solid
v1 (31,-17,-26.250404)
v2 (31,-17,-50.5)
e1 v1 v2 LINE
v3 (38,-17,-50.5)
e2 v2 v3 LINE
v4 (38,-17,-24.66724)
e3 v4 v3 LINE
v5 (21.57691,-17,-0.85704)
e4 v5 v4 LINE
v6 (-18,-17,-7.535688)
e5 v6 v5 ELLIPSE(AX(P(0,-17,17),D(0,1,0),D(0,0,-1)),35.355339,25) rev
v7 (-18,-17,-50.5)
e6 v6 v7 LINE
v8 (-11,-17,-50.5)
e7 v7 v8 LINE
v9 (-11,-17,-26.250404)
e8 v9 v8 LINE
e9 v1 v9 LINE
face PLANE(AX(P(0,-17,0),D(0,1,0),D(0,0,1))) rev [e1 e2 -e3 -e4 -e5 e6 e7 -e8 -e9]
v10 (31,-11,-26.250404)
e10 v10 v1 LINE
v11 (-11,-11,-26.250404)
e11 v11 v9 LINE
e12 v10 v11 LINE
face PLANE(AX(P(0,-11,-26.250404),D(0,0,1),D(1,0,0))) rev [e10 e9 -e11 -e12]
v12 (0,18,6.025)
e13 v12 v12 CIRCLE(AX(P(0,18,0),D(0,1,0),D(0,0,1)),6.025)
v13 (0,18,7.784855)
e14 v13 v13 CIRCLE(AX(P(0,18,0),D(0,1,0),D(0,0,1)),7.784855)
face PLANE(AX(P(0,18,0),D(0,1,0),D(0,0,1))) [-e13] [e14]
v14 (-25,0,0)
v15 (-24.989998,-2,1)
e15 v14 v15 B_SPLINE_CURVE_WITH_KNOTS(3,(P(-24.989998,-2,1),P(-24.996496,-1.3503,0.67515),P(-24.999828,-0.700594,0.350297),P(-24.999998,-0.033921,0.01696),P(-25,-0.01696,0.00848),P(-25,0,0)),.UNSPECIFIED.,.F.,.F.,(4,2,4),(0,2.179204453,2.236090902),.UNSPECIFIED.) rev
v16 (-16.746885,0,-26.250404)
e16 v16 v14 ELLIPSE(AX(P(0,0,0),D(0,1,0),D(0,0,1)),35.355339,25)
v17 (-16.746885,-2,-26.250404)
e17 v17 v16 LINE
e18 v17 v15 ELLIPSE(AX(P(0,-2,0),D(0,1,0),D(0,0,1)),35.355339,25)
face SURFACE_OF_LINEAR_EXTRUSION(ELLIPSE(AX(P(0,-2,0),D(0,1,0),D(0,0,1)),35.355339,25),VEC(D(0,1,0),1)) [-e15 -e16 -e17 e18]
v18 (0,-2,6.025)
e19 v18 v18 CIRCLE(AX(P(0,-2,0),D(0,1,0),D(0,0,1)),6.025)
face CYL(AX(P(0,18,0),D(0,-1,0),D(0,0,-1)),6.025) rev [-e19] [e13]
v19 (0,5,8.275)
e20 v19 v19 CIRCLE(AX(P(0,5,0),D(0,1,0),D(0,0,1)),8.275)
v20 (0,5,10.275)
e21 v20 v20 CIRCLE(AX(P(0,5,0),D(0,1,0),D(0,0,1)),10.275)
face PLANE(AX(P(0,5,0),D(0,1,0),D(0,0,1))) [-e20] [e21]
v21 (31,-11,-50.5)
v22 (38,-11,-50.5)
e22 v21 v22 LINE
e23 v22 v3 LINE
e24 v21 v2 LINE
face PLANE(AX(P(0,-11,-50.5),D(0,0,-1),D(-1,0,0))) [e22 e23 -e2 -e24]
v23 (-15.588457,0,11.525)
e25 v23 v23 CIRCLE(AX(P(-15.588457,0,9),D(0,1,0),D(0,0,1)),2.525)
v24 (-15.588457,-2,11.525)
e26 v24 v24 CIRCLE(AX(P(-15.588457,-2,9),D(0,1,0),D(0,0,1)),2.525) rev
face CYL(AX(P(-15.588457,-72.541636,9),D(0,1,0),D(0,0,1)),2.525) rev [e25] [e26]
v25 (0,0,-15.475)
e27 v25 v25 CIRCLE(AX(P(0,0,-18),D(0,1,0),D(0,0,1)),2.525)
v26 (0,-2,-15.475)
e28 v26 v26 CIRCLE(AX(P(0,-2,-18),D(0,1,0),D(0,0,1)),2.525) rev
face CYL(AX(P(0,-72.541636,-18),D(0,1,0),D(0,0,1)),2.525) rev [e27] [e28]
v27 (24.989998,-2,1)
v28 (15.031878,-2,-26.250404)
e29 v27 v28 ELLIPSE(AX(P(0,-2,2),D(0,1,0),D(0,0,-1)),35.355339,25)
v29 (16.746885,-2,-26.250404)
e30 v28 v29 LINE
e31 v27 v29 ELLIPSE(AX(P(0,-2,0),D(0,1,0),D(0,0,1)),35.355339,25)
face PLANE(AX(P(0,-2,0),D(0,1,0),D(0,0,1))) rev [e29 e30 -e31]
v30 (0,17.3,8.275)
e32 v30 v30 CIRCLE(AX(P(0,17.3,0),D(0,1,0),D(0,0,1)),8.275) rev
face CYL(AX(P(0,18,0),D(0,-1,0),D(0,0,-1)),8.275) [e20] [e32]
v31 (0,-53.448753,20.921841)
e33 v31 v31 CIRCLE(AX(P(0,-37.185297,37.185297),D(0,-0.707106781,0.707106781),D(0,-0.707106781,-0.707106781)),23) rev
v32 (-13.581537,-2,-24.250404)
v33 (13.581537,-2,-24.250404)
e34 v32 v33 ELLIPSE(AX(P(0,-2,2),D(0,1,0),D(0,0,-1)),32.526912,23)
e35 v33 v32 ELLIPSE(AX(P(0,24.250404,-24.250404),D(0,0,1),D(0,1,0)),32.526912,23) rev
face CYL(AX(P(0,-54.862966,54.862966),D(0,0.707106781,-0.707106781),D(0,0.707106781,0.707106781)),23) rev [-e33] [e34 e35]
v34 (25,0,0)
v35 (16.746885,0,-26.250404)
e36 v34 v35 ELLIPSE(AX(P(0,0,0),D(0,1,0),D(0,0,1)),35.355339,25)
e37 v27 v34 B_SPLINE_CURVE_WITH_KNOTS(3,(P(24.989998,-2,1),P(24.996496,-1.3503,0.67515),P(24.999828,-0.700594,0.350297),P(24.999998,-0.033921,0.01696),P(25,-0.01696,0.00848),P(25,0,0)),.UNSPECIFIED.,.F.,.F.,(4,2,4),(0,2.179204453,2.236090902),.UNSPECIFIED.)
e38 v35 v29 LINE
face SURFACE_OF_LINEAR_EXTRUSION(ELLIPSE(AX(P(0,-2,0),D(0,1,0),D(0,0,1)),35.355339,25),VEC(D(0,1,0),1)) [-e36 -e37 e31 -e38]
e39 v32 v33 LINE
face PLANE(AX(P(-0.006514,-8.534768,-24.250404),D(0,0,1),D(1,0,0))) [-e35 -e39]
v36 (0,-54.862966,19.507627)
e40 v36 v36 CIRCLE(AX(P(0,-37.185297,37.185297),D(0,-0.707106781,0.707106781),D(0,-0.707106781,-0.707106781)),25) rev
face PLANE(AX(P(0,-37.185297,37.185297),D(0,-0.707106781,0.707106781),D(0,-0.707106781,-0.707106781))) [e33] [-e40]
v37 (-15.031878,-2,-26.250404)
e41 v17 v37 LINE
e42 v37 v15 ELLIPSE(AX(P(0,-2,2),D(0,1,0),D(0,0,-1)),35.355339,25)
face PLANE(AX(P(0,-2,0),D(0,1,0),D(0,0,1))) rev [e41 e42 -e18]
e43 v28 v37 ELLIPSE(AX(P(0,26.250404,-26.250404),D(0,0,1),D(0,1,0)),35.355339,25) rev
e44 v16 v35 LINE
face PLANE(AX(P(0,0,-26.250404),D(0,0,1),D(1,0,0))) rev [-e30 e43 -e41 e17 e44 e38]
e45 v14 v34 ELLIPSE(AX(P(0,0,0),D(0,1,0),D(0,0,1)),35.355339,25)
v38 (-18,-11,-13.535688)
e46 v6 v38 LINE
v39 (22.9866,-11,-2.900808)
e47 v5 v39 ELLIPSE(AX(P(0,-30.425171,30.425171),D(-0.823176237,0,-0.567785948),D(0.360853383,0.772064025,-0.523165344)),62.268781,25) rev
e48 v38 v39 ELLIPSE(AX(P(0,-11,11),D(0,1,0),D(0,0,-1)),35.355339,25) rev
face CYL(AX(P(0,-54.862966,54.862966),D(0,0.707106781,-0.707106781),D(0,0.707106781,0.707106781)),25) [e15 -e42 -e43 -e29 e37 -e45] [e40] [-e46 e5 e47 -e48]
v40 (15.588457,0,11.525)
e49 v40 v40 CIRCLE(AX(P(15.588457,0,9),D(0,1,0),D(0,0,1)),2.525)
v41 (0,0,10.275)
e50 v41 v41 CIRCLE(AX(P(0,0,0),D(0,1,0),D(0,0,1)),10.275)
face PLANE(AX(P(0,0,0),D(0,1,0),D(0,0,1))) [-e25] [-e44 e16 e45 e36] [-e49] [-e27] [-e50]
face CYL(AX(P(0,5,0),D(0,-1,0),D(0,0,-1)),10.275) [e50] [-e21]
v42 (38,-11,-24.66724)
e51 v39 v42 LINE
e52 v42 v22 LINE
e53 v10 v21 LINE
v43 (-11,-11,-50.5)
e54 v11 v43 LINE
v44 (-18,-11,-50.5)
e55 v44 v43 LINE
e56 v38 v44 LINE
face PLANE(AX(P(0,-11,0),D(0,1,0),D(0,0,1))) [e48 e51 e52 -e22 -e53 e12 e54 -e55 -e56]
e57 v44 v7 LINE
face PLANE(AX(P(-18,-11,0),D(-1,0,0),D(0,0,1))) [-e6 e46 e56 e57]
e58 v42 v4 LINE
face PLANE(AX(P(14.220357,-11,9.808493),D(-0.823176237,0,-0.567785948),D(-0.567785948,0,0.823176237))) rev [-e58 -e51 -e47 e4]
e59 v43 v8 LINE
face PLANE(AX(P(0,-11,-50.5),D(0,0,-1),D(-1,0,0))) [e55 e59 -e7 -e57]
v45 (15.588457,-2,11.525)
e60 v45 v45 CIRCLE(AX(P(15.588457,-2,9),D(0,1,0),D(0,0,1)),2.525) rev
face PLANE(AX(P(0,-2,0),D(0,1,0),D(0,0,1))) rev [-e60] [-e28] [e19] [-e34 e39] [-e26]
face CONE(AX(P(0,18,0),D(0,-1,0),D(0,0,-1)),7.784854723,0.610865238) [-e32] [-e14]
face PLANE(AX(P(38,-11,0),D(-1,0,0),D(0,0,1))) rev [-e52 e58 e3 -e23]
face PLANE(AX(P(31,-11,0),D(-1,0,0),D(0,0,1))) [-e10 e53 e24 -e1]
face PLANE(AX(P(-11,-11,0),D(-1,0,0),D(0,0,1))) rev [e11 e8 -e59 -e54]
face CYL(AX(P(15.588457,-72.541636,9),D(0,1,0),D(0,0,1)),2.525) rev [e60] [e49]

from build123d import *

# Parameters (mm, degrees)
SKETCH1_R                 = 10.275
SKETCH1_R_2               = 8.275
BOSS_EXTRUDE3_DEPTH       = 5
SKETCH1_6_R               = 8.275
SKETCH1_6_R_2             = 6.025
BOSS_EXTRUDE4_DEPTH       = 18
BOSS_EXTRUDE7_DEPTH       = 40
BOSS_EXTRUDE7_DEPTH_BACK  = 70
SKETCH4_R                 = 25
SKETCH4_R_2               = 23
SKETCH7_W                 = 197.712308018
SKETCH7_H                 = 113.854833504
CUT_EXTRUDE4_DEPTH        = 64
BOSS_EXTRUDE9_START       = -2
SKETCH9_RX                = 35.355339059
SKETCH9_RY                = 25
SKETCH9_R                 = 6.025
BOSS_EXTRUDE9_DEPTH       = 2
BOSS_EXTRUDE12_DEPTH      = 2
BOSS_EXTRUDE12_DEPTH_BACK = 4
SKETCH22_W                = 69.752550136
SKETCH22_H                = 19.780641822
CUT_EXTRUDE5_DEPTH        = 10
BOSS_EXTRUDE13_START      = -2
BOSS_EXTRUDE13_DEPTH      = 2
CUT_EXTRUDE6_REACH        = 111.4
SKETCH21_R                = 2.525
CUT_EXTRUDE14_START       = -80
CUT_EXTRUDE14_DEPTH       = 80
CUT_EXTRUDE21_START       = -86
CUT_EXTRUDE21_DEPTH       = 86
SKETCH28_R                = 28.746438964
CUT_EXTRUDE22_DEPTH       = 25
CHAMFER1_SIZE             = 0.7
CHAMFER1_SIZE2            = 0.490145277


with BuildPart() as part:
    # Sketch1 → Boss-Extrude3 (new body)
    with BuildSketch(Plane(origin=(0, 0, 0), x_dir=(1, 0, 0), z_dir=(0, 1, 0))):
        with Locations(Location((0, 0, 0), (0, 0, 270))):
            Circle(SKETCH1_R)
        with Locations(Location((0, 0, 0), (0, 0, 270))):
            Circle(SKETCH1_R_2, mode=Mode.SUBTRACT)
    extrude(amount=BOSS_EXTRUDE3_DEPTH)

    # Sketch1<6> → Boss-Extrude4 (add)
    with BuildSketch(Plane(origin=(0, 0, 0), x_dir=(1, 0, 0), z_dir=(0, 1, 0))):
        with Locations(Location((0, 0, 0), (0, 0, 270))):
            Circle(SKETCH1_6_R)
        with Locations(Location((0, 0, 0), (0, 0, 270))):
            Circle(SKETCH1_6_R_2, mode=Mode.SUBTRACT)
    extrude(amount=BOSS_EXTRUDE4_DEPTH)



with BuildPart() as body_2:
    # Sketch4 → Boss-Extrude7 (new, two sides: drawn at the far end of the back side and taken through both)
    with BuildSketch(Plane(origin=(0, -5.365491749, 5.365491749), x_dir=(-1, 0, 0), z_dir=(0, 0.7071067811865458, -0.7071067811865492)).offset(-BOSS_EXTRUDE7_DEPTH_BACK)):
        with Locations(Location((0, 0, 0), (0, 0, 90))):
            Circle(SKETCH4_R)
        with Locations(Location((0, 0, 0), (0, 0, 90))):
            Circle(SKETCH4_R_2, mode=Mode.SUBTRACT)
    extrude(amount=BOSS_EXTRUDE7_DEPTH + BOSS_EXTRUDE7_DEPTH_BACK)

    # Sketch7 → Cut-Extrude4 (cut)
    with BuildSketch(Plane(origin=(0, 0, 0), x_dir=(1, 0, 0), z_dir=(0, 1, 0))):
        Rectangle(SKETCH7_W, SKETCH7_H)
    extrude(amount=CUT_EXTRUDE4_DEPTH, mode=Mode.SUBTRACT)


with BuildPart() as part_1:
    add(part.part)

    add(body_2.part)  # Boss-Extrude9 merges body 2
    # Sketch9 → Boss-Extrude9 (add)
    with BuildSketch(Plane(origin=(0, 0, 0), x_dir=(1, 0, 0), z_dir=(0, 1, 0)).offset(BOSS_EXTRUDE9_START)):
        with Locations(Location((0, 0), (0, 0, -90))):
            Ellipse(SKETCH9_RX, SKETCH9_RY)
        with Locations(Location((0, 0, 0), (0, 0, 270))):
            Circle(SKETCH9_R, mode=Mode.SUBTRACT)
    extrude(amount=BOSS_EXTRUDE9_DEPTH)

    # Sketch15 → Boss-Extrude12 (add, two sides: drawn at the far end of the back side and taken through both)
    with BuildSketch(Plane(origin=(0, -13, 0), x_dir=(1, 0, 0), z_dir=(0, 1, 0)).offset(-BOSS_EXTRUDE12_DEPTH_BACK)):
        Polygon((-18, 50.5), (-18, 5.077623205), (-11, 12.425207431), (0.436295729, 16.20866498), (9.681434559, 13.33514052), (16.664877802, 7.136081647), (20.985766733, 0), (38, 24.667240496), (38, 50.5), (31, 50.5), (31, 26.250403727), (-11, 26.250403727), (-11, 50.5), align=None)
    extrude(amount=BOSS_EXTRUDE12_DEPTH + BOSS_EXTRUDE12_DEPTH_BACK)

    # Sketch22 → Cut-Extrude5 (cut)
    with BuildSketch(Plane.XY.offset(-26.250403727)):
        Rectangle(SKETCH22_W, SKETCH22_H)
    extrude(amount=-CUT_EXTRUDE5_DEPTH, mode=Mode.SUBTRACT)

    # Boss-Extrude13: read off the stored shape, not the designer's step
    # Boss-Extrude13 outline → Boss-Extrude13 (add)
    with BuildSketch(Plane(origin=(0, 0, -26.250403727), x_dir=(-1, 0, 0), z_dir=(0, 0, -1)).offset(BOSS_EXTRUDE13_START)):
        with BuildLine():
            add(Edge.make_bspline(
                [(13.581537177, -2), (0, -16.053738297), (-13.581537177, -2)],
                knots=[2.5099124, 2.5099124, 2.5099124, 3.773272907, 3.773272907, 3.773272907], degree=2, weights=[1, 0.807036456, 1]))
            Line((13.581537177, -2), (-13.581537177, -2))
        make_face()
    extrude(amount=BOSS_EXTRUDE13_DEPTH)

    # Sketch21 → Cut-Extrude6 (cut, up to next)
    with BuildSketch(Plane(origin=(0, 0, 0), x_dir=(1, 0, 0), z_dir=(0, 1, 0)), mode=Mode.PRIVATE) as cut_extrude6_sk1:
        with Locations(Location((0, 18, 0), (0, 0, 270))):
            Circle(SKETCH21_R)
    cut_extrude6_tool1 = extrude(cut_extrude6_sk1.sketch, amount=-CUT_EXTRUDE6_REACH, mode=Mode.PRIVATE) & part_1.part
    # Sketch21 → Cut-Extrude6 (cut, up to next)
    with BuildSketch(Plane(origin=(0, 0, 0), x_dir=(1, 0, 0), z_dir=(0, 1, 0)), mode=Mode.PRIVATE) as cut_extrude6_sk2:
        with Locations(Location((15.588457268, -9, 0), (0, 0, 270))):
            Circle(SKETCH21_R)
    cut_extrude6_tool2 = extrude(cut_extrude6_sk2.sketch, amount=-CUT_EXTRUDE6_REACH, mode=Mode.PRIVATE) & part_1.part
    # Sketch21 → Cut-Extrude6 (cut, up to next)
    with BuildSketch(Plane(origin=(0, 0, 0), x_dir=(1, 0, 0), z_dir=(0, 1, 0)), mode=Mode.PRIVATE) as cut_extrude6_sk3:
        with Locations(Location((-15.588457268, -9, 0), (0, 0, 270))):
            Circle(SKETCH21_R)
    cut_extrude6_tool3 = extrude(cut_extrude6_sk3.sketch, amount=-CUT_EXTRUDE6_REACH, mode=Mode.PRIVATE) & part_1.part
    add(cut_extrude6_tool1.solids().sort_by_distance((0, 0, -18))[0], mode=Mode.SUBTRACT)
    add(cut_extrude6_tool2.solids().sort_by_distance((15.588457, 0, 9))[0], mode=Mode.SUBTRACT)
    add(cut_extrude6_tool3.solids().sort_by_distance((-15.588457, 0, 9))[0], mode=Mode.SUBTRACT)

    # Sketch25 → Cut-Extrude14 (cut)
    with BuildSketch(Plane(origin=(0, -54.862966432, 54.862966432), x_dir=(1, 0, 0), z_dir=(0, -0.7071067811865458, 0.7071067811865492)).offset(CUT_EXTRUDE14_START)):
        with BuildLine():
            Line((-18.997239916, -12.965526429), (-18.318994403, -10.280413374))
            Line((-18.318994403, -10.280413374), (-10.404229656, -15.136075873))
            Line((-10.404229656, -15.136075873), (-2.155134235, -17.219754227))
            Line((-2.155134235, -17.219754227), (4.378324516, -17.219754227))
            Line((4.378324516, -17.219754227), (10.005758959, -15.720266669))
            Line((10.005758959, -15.720266669), (15.570666352, -12.156224855))
            Line((15.570666352, -12.156224855), (20.908140469, -7.71958569))
            Line((20.908140469, -7.71958569), (21.57633395, -7.966292318))
            ThreePointArc((21.57633395, -7.966292318), (2.812653006, -22.827373547), (-18.997239916, -12.965526429))
        make_face()
    extrude(amount=CUT_EXTRUDE14_DEPTH, mode=Mode.SUBTRACT)

    # Sketch27 → Cut-Extrude21 (cut)
    with BuildSketch(Plane(origin=(0, -54.862966432, 54.862966432), x_dir=(1, 0, 0), z_dir=(0, -0.7071067811865458, 0.7071067811865492)).offset(CUT_EXTRUDE21_START)):
        with BuildLine():
            Line((-14.900346348, -17.520835559), (14.900346348, -17.520835559))
            ThreePointArc((14.900346348, -17.520835559), (0, -23), (-14.900346348, -17.520835559))
        make_face()
    extrude(amount=CUT_EXTRUDE21_DEPTH, mode=Mode.SUBTRACT)

    # Sketch28 → Cut-Extrude22 (cut)
    with BuildSketch(Plane(origin=(0, -54.862966432, 54.862966432), x_dir=(1, 0, 0), z_dir=(0, -0.7071067811865458, 0.7071067811865492))):
        Circle(SKETCH28_R)
    extrude(amount=-CUT_EXTRUDE22_DEPTH, mode=Mode.SUBTRACT)

    # Chamfer1
    chamfer1_edges = [part_1.edges().sort_by_distance(p)[0] for p in [
        (0, 18, -8.275),
    ]]
    chamfer1_side = [part_1.faces().sort_by_distance(p)[0] for p in [
        (0, 11.5, -8.275),
    ]]
    chamfer(chamfer1_edges, length=CHAMFER1_SIZE, length2=CHAMFER1_SIZE2, reference=chamfer1_side[0])


solid = part_1.part
